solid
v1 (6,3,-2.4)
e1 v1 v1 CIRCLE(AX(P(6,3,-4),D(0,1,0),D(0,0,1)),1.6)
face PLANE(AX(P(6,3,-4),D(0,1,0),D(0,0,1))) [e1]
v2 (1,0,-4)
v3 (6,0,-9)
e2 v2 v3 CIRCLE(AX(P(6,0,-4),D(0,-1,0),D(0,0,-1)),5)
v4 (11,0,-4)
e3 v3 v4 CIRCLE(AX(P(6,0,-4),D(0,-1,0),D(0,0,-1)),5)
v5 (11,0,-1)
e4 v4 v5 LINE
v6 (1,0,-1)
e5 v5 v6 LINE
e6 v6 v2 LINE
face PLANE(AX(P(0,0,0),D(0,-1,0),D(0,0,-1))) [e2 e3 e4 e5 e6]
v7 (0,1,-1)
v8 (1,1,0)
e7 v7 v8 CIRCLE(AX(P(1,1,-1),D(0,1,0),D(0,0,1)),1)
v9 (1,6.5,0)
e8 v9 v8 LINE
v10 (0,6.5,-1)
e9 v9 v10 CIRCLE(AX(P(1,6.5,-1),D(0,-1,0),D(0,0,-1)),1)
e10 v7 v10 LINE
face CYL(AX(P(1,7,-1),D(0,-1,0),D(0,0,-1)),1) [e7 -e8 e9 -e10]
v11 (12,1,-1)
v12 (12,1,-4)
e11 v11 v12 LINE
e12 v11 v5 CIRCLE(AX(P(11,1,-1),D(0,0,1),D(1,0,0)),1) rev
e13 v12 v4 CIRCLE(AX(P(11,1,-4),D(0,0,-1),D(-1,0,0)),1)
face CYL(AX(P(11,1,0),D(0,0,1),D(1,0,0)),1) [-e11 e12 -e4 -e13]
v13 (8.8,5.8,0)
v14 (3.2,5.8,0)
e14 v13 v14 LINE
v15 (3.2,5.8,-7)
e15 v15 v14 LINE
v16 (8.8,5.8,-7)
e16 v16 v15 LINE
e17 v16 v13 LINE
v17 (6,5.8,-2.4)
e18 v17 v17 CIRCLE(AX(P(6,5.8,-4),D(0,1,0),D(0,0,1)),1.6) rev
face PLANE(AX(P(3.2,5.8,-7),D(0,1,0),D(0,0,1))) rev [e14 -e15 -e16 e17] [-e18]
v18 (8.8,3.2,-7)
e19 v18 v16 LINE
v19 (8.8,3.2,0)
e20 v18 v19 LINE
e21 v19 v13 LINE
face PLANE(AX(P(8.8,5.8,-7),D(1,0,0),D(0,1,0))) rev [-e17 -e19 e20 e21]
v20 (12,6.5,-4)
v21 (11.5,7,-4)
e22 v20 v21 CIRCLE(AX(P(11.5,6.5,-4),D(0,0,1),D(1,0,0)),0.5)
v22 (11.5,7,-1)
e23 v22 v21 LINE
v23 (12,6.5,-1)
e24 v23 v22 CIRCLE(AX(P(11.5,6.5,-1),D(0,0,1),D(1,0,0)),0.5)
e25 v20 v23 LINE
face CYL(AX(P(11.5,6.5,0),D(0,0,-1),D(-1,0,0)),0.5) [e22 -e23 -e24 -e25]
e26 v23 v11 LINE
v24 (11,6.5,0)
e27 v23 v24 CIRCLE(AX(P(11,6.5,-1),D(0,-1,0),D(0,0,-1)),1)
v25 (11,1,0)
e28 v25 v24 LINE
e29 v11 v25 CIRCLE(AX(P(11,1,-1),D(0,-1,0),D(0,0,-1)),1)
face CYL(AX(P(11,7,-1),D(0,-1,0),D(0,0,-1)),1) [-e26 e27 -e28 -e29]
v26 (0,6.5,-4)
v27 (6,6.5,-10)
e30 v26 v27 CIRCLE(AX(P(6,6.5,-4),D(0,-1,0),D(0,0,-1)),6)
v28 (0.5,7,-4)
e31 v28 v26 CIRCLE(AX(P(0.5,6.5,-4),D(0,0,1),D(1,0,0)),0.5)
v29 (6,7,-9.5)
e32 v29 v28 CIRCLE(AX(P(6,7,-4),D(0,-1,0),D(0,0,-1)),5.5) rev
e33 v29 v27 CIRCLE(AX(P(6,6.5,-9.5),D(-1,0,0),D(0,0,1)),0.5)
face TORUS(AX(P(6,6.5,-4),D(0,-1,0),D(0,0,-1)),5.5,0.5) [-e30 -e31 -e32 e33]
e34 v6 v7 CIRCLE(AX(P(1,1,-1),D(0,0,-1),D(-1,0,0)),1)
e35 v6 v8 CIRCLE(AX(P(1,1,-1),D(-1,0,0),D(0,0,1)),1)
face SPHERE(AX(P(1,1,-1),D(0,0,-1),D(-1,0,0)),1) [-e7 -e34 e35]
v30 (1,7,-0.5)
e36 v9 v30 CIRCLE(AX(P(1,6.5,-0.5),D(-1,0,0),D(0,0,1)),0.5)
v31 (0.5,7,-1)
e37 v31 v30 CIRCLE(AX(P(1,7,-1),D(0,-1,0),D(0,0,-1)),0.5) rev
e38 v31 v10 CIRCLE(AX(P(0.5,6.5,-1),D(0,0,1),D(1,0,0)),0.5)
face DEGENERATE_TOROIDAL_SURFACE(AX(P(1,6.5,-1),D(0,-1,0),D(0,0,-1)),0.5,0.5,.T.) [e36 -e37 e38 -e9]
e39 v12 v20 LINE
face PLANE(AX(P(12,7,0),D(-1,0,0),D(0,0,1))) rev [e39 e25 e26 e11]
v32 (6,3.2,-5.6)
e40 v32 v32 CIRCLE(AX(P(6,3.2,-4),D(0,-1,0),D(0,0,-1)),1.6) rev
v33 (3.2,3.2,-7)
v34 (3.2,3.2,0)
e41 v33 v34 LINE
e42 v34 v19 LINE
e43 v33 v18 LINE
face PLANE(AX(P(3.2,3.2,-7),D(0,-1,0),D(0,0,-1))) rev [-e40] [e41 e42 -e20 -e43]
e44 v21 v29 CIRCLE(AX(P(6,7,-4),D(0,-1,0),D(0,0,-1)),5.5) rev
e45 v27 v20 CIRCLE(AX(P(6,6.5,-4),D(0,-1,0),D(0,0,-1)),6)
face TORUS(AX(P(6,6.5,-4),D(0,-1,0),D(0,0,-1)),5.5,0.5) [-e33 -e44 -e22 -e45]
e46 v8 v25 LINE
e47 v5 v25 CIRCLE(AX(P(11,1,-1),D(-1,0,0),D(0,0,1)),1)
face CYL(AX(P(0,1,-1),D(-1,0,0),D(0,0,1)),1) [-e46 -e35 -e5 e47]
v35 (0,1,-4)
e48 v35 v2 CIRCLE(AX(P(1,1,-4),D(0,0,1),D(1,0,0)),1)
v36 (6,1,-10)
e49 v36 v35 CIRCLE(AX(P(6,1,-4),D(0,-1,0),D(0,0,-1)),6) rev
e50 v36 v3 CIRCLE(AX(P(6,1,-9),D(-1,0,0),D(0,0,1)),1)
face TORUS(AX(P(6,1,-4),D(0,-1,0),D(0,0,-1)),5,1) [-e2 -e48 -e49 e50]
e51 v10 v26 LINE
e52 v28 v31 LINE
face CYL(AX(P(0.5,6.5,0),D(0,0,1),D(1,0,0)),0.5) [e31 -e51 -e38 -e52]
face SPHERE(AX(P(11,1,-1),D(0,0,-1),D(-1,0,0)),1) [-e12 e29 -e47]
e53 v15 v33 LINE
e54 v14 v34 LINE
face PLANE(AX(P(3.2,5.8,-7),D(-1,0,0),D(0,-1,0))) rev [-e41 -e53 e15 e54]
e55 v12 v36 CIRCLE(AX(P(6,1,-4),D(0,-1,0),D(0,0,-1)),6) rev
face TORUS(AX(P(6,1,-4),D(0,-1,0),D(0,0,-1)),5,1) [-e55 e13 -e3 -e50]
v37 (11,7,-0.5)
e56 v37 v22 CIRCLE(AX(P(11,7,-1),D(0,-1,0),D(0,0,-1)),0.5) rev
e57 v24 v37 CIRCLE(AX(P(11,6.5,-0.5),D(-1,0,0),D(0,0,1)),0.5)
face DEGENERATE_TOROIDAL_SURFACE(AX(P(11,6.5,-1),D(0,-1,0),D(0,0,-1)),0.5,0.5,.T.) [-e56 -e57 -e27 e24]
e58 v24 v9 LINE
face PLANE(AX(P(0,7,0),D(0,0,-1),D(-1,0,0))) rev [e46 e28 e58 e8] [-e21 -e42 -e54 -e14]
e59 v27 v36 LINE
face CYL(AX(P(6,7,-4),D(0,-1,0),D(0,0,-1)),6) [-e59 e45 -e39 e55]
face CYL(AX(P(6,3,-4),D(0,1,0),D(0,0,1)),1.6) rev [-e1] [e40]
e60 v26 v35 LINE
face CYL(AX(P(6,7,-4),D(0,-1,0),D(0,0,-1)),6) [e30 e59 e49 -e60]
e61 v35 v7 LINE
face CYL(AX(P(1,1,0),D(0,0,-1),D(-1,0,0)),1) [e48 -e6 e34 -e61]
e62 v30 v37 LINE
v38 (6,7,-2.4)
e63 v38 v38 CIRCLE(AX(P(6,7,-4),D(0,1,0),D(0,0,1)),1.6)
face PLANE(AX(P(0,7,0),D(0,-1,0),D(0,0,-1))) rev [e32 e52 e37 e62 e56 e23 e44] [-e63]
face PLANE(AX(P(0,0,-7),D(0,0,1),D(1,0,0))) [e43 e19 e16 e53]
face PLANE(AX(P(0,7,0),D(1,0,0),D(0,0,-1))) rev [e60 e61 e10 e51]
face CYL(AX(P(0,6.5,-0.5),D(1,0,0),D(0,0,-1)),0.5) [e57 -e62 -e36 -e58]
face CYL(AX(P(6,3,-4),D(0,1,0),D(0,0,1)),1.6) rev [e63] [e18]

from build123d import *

# Parameters (mm, degrees)
SKETCH1_W           = 12
SKETCH1_H           = 10
BOSS_EXTRUDE1_DEPTH = 7
SKETCH2_R           = 1.6
CUT_EXTRUDE1_DEPTH  = 4
SKETCH3_W           = 5.6
SKETCH3_H           = 2.6
CUT_EXTRUDE2_DEPTH  = 7
FILLET1_R           = 6
FILLET2_R           = 1
FILLET3_R           = 1
FILLET4_R           = 0.5


with BuildPart() as part:
    # Sketch1 → Boss-Extrude1 (new body)
    with BuildSketch(Plane(origin=(0, 0, 0), x_dir=(1, 0, 0), z_dir=(0, 1, 0))):
        with Locations((6, 5)):
            Rectangle(SKETCH1_W, SKETCH1_H)
    extrude(amount=BOSS_EXTRUDE1_DEPTH)

    # Sketch2 → Cut-Extrude1 (cut)
    with BuildSketch(Plane(origin=(0, 7, 0), x_dir=(1, 0, 0), z_dir=(0, 1, 0))):
        with Locations(Location((6, 4, 0), (0, 0, 270))):
            Circle(SKETCH2_R)
    extrude(amount=-CUT_EXTRUDE1_DEPTH, mode=Mode.SUBTRACT)

    # Sketch3 → Cut-Extrude2 (cut)
    with BuildSketch(Plane.XY):
        with Locations((6, 4.5)):
            Rectangle(SKETCH3_W, SKETCH3_H)
    extrude(amount=-CUT_EXTRUDE2_DEPTH, mode=Mode.SUBTRACT)

    # Fillet1
    fillet1_edges = [part.edges().sort_by_distance(p)[0] for p in [
        (0, 3.5, -10),
        (12, 3.5, -10),
    ]]
    fillet(fillet1_edges, radius=FILLET1_R - 0.0001)  # a hair under: the kernel refuses the full size

    # Fillet2
    fillet2_edges = [part.edges().sort_by_distance(p)[0] for p in [
        (0, 0, -2.00005),
        (10.242669976, 0, -8.242669976),
        (1.757330024, 0, -8.242669976),
        (12, 0, -2.00005),
    ]]
    fillet(fillet2_edges, radius=FILLET2_R)

    # Fillet3
    fillet3_edges = [part.edges().sort_by_distance(p)[0] for p in [
        (6, 0, 0),
        (11.707106781, 0.292893219, 0),
        (0.292893219, 0.292893219, 0),
        (12, 4, 0),
        (0, 4, 0),
    ]]
    fillet(fillet3_edges, radius=FILLET3_R)

    # Fillet4
    fillet4_edges = [part.edges().sort_by_distance(p)[0] for p in [
        (0, 7, -2.50005),
        (10.242669976, 7, -8.242669976),
        (1.757330024, 7, -8.242669976),
        (6, 7, 0),
        (12, 7, -2.50005),
        (11.707106781, 7, -0.292893219),
        (0.292893219, 7, -0.292893219),
    ]]
    fillet(fillet4_edges, radius=FILLET4_R)


solid = part.part
